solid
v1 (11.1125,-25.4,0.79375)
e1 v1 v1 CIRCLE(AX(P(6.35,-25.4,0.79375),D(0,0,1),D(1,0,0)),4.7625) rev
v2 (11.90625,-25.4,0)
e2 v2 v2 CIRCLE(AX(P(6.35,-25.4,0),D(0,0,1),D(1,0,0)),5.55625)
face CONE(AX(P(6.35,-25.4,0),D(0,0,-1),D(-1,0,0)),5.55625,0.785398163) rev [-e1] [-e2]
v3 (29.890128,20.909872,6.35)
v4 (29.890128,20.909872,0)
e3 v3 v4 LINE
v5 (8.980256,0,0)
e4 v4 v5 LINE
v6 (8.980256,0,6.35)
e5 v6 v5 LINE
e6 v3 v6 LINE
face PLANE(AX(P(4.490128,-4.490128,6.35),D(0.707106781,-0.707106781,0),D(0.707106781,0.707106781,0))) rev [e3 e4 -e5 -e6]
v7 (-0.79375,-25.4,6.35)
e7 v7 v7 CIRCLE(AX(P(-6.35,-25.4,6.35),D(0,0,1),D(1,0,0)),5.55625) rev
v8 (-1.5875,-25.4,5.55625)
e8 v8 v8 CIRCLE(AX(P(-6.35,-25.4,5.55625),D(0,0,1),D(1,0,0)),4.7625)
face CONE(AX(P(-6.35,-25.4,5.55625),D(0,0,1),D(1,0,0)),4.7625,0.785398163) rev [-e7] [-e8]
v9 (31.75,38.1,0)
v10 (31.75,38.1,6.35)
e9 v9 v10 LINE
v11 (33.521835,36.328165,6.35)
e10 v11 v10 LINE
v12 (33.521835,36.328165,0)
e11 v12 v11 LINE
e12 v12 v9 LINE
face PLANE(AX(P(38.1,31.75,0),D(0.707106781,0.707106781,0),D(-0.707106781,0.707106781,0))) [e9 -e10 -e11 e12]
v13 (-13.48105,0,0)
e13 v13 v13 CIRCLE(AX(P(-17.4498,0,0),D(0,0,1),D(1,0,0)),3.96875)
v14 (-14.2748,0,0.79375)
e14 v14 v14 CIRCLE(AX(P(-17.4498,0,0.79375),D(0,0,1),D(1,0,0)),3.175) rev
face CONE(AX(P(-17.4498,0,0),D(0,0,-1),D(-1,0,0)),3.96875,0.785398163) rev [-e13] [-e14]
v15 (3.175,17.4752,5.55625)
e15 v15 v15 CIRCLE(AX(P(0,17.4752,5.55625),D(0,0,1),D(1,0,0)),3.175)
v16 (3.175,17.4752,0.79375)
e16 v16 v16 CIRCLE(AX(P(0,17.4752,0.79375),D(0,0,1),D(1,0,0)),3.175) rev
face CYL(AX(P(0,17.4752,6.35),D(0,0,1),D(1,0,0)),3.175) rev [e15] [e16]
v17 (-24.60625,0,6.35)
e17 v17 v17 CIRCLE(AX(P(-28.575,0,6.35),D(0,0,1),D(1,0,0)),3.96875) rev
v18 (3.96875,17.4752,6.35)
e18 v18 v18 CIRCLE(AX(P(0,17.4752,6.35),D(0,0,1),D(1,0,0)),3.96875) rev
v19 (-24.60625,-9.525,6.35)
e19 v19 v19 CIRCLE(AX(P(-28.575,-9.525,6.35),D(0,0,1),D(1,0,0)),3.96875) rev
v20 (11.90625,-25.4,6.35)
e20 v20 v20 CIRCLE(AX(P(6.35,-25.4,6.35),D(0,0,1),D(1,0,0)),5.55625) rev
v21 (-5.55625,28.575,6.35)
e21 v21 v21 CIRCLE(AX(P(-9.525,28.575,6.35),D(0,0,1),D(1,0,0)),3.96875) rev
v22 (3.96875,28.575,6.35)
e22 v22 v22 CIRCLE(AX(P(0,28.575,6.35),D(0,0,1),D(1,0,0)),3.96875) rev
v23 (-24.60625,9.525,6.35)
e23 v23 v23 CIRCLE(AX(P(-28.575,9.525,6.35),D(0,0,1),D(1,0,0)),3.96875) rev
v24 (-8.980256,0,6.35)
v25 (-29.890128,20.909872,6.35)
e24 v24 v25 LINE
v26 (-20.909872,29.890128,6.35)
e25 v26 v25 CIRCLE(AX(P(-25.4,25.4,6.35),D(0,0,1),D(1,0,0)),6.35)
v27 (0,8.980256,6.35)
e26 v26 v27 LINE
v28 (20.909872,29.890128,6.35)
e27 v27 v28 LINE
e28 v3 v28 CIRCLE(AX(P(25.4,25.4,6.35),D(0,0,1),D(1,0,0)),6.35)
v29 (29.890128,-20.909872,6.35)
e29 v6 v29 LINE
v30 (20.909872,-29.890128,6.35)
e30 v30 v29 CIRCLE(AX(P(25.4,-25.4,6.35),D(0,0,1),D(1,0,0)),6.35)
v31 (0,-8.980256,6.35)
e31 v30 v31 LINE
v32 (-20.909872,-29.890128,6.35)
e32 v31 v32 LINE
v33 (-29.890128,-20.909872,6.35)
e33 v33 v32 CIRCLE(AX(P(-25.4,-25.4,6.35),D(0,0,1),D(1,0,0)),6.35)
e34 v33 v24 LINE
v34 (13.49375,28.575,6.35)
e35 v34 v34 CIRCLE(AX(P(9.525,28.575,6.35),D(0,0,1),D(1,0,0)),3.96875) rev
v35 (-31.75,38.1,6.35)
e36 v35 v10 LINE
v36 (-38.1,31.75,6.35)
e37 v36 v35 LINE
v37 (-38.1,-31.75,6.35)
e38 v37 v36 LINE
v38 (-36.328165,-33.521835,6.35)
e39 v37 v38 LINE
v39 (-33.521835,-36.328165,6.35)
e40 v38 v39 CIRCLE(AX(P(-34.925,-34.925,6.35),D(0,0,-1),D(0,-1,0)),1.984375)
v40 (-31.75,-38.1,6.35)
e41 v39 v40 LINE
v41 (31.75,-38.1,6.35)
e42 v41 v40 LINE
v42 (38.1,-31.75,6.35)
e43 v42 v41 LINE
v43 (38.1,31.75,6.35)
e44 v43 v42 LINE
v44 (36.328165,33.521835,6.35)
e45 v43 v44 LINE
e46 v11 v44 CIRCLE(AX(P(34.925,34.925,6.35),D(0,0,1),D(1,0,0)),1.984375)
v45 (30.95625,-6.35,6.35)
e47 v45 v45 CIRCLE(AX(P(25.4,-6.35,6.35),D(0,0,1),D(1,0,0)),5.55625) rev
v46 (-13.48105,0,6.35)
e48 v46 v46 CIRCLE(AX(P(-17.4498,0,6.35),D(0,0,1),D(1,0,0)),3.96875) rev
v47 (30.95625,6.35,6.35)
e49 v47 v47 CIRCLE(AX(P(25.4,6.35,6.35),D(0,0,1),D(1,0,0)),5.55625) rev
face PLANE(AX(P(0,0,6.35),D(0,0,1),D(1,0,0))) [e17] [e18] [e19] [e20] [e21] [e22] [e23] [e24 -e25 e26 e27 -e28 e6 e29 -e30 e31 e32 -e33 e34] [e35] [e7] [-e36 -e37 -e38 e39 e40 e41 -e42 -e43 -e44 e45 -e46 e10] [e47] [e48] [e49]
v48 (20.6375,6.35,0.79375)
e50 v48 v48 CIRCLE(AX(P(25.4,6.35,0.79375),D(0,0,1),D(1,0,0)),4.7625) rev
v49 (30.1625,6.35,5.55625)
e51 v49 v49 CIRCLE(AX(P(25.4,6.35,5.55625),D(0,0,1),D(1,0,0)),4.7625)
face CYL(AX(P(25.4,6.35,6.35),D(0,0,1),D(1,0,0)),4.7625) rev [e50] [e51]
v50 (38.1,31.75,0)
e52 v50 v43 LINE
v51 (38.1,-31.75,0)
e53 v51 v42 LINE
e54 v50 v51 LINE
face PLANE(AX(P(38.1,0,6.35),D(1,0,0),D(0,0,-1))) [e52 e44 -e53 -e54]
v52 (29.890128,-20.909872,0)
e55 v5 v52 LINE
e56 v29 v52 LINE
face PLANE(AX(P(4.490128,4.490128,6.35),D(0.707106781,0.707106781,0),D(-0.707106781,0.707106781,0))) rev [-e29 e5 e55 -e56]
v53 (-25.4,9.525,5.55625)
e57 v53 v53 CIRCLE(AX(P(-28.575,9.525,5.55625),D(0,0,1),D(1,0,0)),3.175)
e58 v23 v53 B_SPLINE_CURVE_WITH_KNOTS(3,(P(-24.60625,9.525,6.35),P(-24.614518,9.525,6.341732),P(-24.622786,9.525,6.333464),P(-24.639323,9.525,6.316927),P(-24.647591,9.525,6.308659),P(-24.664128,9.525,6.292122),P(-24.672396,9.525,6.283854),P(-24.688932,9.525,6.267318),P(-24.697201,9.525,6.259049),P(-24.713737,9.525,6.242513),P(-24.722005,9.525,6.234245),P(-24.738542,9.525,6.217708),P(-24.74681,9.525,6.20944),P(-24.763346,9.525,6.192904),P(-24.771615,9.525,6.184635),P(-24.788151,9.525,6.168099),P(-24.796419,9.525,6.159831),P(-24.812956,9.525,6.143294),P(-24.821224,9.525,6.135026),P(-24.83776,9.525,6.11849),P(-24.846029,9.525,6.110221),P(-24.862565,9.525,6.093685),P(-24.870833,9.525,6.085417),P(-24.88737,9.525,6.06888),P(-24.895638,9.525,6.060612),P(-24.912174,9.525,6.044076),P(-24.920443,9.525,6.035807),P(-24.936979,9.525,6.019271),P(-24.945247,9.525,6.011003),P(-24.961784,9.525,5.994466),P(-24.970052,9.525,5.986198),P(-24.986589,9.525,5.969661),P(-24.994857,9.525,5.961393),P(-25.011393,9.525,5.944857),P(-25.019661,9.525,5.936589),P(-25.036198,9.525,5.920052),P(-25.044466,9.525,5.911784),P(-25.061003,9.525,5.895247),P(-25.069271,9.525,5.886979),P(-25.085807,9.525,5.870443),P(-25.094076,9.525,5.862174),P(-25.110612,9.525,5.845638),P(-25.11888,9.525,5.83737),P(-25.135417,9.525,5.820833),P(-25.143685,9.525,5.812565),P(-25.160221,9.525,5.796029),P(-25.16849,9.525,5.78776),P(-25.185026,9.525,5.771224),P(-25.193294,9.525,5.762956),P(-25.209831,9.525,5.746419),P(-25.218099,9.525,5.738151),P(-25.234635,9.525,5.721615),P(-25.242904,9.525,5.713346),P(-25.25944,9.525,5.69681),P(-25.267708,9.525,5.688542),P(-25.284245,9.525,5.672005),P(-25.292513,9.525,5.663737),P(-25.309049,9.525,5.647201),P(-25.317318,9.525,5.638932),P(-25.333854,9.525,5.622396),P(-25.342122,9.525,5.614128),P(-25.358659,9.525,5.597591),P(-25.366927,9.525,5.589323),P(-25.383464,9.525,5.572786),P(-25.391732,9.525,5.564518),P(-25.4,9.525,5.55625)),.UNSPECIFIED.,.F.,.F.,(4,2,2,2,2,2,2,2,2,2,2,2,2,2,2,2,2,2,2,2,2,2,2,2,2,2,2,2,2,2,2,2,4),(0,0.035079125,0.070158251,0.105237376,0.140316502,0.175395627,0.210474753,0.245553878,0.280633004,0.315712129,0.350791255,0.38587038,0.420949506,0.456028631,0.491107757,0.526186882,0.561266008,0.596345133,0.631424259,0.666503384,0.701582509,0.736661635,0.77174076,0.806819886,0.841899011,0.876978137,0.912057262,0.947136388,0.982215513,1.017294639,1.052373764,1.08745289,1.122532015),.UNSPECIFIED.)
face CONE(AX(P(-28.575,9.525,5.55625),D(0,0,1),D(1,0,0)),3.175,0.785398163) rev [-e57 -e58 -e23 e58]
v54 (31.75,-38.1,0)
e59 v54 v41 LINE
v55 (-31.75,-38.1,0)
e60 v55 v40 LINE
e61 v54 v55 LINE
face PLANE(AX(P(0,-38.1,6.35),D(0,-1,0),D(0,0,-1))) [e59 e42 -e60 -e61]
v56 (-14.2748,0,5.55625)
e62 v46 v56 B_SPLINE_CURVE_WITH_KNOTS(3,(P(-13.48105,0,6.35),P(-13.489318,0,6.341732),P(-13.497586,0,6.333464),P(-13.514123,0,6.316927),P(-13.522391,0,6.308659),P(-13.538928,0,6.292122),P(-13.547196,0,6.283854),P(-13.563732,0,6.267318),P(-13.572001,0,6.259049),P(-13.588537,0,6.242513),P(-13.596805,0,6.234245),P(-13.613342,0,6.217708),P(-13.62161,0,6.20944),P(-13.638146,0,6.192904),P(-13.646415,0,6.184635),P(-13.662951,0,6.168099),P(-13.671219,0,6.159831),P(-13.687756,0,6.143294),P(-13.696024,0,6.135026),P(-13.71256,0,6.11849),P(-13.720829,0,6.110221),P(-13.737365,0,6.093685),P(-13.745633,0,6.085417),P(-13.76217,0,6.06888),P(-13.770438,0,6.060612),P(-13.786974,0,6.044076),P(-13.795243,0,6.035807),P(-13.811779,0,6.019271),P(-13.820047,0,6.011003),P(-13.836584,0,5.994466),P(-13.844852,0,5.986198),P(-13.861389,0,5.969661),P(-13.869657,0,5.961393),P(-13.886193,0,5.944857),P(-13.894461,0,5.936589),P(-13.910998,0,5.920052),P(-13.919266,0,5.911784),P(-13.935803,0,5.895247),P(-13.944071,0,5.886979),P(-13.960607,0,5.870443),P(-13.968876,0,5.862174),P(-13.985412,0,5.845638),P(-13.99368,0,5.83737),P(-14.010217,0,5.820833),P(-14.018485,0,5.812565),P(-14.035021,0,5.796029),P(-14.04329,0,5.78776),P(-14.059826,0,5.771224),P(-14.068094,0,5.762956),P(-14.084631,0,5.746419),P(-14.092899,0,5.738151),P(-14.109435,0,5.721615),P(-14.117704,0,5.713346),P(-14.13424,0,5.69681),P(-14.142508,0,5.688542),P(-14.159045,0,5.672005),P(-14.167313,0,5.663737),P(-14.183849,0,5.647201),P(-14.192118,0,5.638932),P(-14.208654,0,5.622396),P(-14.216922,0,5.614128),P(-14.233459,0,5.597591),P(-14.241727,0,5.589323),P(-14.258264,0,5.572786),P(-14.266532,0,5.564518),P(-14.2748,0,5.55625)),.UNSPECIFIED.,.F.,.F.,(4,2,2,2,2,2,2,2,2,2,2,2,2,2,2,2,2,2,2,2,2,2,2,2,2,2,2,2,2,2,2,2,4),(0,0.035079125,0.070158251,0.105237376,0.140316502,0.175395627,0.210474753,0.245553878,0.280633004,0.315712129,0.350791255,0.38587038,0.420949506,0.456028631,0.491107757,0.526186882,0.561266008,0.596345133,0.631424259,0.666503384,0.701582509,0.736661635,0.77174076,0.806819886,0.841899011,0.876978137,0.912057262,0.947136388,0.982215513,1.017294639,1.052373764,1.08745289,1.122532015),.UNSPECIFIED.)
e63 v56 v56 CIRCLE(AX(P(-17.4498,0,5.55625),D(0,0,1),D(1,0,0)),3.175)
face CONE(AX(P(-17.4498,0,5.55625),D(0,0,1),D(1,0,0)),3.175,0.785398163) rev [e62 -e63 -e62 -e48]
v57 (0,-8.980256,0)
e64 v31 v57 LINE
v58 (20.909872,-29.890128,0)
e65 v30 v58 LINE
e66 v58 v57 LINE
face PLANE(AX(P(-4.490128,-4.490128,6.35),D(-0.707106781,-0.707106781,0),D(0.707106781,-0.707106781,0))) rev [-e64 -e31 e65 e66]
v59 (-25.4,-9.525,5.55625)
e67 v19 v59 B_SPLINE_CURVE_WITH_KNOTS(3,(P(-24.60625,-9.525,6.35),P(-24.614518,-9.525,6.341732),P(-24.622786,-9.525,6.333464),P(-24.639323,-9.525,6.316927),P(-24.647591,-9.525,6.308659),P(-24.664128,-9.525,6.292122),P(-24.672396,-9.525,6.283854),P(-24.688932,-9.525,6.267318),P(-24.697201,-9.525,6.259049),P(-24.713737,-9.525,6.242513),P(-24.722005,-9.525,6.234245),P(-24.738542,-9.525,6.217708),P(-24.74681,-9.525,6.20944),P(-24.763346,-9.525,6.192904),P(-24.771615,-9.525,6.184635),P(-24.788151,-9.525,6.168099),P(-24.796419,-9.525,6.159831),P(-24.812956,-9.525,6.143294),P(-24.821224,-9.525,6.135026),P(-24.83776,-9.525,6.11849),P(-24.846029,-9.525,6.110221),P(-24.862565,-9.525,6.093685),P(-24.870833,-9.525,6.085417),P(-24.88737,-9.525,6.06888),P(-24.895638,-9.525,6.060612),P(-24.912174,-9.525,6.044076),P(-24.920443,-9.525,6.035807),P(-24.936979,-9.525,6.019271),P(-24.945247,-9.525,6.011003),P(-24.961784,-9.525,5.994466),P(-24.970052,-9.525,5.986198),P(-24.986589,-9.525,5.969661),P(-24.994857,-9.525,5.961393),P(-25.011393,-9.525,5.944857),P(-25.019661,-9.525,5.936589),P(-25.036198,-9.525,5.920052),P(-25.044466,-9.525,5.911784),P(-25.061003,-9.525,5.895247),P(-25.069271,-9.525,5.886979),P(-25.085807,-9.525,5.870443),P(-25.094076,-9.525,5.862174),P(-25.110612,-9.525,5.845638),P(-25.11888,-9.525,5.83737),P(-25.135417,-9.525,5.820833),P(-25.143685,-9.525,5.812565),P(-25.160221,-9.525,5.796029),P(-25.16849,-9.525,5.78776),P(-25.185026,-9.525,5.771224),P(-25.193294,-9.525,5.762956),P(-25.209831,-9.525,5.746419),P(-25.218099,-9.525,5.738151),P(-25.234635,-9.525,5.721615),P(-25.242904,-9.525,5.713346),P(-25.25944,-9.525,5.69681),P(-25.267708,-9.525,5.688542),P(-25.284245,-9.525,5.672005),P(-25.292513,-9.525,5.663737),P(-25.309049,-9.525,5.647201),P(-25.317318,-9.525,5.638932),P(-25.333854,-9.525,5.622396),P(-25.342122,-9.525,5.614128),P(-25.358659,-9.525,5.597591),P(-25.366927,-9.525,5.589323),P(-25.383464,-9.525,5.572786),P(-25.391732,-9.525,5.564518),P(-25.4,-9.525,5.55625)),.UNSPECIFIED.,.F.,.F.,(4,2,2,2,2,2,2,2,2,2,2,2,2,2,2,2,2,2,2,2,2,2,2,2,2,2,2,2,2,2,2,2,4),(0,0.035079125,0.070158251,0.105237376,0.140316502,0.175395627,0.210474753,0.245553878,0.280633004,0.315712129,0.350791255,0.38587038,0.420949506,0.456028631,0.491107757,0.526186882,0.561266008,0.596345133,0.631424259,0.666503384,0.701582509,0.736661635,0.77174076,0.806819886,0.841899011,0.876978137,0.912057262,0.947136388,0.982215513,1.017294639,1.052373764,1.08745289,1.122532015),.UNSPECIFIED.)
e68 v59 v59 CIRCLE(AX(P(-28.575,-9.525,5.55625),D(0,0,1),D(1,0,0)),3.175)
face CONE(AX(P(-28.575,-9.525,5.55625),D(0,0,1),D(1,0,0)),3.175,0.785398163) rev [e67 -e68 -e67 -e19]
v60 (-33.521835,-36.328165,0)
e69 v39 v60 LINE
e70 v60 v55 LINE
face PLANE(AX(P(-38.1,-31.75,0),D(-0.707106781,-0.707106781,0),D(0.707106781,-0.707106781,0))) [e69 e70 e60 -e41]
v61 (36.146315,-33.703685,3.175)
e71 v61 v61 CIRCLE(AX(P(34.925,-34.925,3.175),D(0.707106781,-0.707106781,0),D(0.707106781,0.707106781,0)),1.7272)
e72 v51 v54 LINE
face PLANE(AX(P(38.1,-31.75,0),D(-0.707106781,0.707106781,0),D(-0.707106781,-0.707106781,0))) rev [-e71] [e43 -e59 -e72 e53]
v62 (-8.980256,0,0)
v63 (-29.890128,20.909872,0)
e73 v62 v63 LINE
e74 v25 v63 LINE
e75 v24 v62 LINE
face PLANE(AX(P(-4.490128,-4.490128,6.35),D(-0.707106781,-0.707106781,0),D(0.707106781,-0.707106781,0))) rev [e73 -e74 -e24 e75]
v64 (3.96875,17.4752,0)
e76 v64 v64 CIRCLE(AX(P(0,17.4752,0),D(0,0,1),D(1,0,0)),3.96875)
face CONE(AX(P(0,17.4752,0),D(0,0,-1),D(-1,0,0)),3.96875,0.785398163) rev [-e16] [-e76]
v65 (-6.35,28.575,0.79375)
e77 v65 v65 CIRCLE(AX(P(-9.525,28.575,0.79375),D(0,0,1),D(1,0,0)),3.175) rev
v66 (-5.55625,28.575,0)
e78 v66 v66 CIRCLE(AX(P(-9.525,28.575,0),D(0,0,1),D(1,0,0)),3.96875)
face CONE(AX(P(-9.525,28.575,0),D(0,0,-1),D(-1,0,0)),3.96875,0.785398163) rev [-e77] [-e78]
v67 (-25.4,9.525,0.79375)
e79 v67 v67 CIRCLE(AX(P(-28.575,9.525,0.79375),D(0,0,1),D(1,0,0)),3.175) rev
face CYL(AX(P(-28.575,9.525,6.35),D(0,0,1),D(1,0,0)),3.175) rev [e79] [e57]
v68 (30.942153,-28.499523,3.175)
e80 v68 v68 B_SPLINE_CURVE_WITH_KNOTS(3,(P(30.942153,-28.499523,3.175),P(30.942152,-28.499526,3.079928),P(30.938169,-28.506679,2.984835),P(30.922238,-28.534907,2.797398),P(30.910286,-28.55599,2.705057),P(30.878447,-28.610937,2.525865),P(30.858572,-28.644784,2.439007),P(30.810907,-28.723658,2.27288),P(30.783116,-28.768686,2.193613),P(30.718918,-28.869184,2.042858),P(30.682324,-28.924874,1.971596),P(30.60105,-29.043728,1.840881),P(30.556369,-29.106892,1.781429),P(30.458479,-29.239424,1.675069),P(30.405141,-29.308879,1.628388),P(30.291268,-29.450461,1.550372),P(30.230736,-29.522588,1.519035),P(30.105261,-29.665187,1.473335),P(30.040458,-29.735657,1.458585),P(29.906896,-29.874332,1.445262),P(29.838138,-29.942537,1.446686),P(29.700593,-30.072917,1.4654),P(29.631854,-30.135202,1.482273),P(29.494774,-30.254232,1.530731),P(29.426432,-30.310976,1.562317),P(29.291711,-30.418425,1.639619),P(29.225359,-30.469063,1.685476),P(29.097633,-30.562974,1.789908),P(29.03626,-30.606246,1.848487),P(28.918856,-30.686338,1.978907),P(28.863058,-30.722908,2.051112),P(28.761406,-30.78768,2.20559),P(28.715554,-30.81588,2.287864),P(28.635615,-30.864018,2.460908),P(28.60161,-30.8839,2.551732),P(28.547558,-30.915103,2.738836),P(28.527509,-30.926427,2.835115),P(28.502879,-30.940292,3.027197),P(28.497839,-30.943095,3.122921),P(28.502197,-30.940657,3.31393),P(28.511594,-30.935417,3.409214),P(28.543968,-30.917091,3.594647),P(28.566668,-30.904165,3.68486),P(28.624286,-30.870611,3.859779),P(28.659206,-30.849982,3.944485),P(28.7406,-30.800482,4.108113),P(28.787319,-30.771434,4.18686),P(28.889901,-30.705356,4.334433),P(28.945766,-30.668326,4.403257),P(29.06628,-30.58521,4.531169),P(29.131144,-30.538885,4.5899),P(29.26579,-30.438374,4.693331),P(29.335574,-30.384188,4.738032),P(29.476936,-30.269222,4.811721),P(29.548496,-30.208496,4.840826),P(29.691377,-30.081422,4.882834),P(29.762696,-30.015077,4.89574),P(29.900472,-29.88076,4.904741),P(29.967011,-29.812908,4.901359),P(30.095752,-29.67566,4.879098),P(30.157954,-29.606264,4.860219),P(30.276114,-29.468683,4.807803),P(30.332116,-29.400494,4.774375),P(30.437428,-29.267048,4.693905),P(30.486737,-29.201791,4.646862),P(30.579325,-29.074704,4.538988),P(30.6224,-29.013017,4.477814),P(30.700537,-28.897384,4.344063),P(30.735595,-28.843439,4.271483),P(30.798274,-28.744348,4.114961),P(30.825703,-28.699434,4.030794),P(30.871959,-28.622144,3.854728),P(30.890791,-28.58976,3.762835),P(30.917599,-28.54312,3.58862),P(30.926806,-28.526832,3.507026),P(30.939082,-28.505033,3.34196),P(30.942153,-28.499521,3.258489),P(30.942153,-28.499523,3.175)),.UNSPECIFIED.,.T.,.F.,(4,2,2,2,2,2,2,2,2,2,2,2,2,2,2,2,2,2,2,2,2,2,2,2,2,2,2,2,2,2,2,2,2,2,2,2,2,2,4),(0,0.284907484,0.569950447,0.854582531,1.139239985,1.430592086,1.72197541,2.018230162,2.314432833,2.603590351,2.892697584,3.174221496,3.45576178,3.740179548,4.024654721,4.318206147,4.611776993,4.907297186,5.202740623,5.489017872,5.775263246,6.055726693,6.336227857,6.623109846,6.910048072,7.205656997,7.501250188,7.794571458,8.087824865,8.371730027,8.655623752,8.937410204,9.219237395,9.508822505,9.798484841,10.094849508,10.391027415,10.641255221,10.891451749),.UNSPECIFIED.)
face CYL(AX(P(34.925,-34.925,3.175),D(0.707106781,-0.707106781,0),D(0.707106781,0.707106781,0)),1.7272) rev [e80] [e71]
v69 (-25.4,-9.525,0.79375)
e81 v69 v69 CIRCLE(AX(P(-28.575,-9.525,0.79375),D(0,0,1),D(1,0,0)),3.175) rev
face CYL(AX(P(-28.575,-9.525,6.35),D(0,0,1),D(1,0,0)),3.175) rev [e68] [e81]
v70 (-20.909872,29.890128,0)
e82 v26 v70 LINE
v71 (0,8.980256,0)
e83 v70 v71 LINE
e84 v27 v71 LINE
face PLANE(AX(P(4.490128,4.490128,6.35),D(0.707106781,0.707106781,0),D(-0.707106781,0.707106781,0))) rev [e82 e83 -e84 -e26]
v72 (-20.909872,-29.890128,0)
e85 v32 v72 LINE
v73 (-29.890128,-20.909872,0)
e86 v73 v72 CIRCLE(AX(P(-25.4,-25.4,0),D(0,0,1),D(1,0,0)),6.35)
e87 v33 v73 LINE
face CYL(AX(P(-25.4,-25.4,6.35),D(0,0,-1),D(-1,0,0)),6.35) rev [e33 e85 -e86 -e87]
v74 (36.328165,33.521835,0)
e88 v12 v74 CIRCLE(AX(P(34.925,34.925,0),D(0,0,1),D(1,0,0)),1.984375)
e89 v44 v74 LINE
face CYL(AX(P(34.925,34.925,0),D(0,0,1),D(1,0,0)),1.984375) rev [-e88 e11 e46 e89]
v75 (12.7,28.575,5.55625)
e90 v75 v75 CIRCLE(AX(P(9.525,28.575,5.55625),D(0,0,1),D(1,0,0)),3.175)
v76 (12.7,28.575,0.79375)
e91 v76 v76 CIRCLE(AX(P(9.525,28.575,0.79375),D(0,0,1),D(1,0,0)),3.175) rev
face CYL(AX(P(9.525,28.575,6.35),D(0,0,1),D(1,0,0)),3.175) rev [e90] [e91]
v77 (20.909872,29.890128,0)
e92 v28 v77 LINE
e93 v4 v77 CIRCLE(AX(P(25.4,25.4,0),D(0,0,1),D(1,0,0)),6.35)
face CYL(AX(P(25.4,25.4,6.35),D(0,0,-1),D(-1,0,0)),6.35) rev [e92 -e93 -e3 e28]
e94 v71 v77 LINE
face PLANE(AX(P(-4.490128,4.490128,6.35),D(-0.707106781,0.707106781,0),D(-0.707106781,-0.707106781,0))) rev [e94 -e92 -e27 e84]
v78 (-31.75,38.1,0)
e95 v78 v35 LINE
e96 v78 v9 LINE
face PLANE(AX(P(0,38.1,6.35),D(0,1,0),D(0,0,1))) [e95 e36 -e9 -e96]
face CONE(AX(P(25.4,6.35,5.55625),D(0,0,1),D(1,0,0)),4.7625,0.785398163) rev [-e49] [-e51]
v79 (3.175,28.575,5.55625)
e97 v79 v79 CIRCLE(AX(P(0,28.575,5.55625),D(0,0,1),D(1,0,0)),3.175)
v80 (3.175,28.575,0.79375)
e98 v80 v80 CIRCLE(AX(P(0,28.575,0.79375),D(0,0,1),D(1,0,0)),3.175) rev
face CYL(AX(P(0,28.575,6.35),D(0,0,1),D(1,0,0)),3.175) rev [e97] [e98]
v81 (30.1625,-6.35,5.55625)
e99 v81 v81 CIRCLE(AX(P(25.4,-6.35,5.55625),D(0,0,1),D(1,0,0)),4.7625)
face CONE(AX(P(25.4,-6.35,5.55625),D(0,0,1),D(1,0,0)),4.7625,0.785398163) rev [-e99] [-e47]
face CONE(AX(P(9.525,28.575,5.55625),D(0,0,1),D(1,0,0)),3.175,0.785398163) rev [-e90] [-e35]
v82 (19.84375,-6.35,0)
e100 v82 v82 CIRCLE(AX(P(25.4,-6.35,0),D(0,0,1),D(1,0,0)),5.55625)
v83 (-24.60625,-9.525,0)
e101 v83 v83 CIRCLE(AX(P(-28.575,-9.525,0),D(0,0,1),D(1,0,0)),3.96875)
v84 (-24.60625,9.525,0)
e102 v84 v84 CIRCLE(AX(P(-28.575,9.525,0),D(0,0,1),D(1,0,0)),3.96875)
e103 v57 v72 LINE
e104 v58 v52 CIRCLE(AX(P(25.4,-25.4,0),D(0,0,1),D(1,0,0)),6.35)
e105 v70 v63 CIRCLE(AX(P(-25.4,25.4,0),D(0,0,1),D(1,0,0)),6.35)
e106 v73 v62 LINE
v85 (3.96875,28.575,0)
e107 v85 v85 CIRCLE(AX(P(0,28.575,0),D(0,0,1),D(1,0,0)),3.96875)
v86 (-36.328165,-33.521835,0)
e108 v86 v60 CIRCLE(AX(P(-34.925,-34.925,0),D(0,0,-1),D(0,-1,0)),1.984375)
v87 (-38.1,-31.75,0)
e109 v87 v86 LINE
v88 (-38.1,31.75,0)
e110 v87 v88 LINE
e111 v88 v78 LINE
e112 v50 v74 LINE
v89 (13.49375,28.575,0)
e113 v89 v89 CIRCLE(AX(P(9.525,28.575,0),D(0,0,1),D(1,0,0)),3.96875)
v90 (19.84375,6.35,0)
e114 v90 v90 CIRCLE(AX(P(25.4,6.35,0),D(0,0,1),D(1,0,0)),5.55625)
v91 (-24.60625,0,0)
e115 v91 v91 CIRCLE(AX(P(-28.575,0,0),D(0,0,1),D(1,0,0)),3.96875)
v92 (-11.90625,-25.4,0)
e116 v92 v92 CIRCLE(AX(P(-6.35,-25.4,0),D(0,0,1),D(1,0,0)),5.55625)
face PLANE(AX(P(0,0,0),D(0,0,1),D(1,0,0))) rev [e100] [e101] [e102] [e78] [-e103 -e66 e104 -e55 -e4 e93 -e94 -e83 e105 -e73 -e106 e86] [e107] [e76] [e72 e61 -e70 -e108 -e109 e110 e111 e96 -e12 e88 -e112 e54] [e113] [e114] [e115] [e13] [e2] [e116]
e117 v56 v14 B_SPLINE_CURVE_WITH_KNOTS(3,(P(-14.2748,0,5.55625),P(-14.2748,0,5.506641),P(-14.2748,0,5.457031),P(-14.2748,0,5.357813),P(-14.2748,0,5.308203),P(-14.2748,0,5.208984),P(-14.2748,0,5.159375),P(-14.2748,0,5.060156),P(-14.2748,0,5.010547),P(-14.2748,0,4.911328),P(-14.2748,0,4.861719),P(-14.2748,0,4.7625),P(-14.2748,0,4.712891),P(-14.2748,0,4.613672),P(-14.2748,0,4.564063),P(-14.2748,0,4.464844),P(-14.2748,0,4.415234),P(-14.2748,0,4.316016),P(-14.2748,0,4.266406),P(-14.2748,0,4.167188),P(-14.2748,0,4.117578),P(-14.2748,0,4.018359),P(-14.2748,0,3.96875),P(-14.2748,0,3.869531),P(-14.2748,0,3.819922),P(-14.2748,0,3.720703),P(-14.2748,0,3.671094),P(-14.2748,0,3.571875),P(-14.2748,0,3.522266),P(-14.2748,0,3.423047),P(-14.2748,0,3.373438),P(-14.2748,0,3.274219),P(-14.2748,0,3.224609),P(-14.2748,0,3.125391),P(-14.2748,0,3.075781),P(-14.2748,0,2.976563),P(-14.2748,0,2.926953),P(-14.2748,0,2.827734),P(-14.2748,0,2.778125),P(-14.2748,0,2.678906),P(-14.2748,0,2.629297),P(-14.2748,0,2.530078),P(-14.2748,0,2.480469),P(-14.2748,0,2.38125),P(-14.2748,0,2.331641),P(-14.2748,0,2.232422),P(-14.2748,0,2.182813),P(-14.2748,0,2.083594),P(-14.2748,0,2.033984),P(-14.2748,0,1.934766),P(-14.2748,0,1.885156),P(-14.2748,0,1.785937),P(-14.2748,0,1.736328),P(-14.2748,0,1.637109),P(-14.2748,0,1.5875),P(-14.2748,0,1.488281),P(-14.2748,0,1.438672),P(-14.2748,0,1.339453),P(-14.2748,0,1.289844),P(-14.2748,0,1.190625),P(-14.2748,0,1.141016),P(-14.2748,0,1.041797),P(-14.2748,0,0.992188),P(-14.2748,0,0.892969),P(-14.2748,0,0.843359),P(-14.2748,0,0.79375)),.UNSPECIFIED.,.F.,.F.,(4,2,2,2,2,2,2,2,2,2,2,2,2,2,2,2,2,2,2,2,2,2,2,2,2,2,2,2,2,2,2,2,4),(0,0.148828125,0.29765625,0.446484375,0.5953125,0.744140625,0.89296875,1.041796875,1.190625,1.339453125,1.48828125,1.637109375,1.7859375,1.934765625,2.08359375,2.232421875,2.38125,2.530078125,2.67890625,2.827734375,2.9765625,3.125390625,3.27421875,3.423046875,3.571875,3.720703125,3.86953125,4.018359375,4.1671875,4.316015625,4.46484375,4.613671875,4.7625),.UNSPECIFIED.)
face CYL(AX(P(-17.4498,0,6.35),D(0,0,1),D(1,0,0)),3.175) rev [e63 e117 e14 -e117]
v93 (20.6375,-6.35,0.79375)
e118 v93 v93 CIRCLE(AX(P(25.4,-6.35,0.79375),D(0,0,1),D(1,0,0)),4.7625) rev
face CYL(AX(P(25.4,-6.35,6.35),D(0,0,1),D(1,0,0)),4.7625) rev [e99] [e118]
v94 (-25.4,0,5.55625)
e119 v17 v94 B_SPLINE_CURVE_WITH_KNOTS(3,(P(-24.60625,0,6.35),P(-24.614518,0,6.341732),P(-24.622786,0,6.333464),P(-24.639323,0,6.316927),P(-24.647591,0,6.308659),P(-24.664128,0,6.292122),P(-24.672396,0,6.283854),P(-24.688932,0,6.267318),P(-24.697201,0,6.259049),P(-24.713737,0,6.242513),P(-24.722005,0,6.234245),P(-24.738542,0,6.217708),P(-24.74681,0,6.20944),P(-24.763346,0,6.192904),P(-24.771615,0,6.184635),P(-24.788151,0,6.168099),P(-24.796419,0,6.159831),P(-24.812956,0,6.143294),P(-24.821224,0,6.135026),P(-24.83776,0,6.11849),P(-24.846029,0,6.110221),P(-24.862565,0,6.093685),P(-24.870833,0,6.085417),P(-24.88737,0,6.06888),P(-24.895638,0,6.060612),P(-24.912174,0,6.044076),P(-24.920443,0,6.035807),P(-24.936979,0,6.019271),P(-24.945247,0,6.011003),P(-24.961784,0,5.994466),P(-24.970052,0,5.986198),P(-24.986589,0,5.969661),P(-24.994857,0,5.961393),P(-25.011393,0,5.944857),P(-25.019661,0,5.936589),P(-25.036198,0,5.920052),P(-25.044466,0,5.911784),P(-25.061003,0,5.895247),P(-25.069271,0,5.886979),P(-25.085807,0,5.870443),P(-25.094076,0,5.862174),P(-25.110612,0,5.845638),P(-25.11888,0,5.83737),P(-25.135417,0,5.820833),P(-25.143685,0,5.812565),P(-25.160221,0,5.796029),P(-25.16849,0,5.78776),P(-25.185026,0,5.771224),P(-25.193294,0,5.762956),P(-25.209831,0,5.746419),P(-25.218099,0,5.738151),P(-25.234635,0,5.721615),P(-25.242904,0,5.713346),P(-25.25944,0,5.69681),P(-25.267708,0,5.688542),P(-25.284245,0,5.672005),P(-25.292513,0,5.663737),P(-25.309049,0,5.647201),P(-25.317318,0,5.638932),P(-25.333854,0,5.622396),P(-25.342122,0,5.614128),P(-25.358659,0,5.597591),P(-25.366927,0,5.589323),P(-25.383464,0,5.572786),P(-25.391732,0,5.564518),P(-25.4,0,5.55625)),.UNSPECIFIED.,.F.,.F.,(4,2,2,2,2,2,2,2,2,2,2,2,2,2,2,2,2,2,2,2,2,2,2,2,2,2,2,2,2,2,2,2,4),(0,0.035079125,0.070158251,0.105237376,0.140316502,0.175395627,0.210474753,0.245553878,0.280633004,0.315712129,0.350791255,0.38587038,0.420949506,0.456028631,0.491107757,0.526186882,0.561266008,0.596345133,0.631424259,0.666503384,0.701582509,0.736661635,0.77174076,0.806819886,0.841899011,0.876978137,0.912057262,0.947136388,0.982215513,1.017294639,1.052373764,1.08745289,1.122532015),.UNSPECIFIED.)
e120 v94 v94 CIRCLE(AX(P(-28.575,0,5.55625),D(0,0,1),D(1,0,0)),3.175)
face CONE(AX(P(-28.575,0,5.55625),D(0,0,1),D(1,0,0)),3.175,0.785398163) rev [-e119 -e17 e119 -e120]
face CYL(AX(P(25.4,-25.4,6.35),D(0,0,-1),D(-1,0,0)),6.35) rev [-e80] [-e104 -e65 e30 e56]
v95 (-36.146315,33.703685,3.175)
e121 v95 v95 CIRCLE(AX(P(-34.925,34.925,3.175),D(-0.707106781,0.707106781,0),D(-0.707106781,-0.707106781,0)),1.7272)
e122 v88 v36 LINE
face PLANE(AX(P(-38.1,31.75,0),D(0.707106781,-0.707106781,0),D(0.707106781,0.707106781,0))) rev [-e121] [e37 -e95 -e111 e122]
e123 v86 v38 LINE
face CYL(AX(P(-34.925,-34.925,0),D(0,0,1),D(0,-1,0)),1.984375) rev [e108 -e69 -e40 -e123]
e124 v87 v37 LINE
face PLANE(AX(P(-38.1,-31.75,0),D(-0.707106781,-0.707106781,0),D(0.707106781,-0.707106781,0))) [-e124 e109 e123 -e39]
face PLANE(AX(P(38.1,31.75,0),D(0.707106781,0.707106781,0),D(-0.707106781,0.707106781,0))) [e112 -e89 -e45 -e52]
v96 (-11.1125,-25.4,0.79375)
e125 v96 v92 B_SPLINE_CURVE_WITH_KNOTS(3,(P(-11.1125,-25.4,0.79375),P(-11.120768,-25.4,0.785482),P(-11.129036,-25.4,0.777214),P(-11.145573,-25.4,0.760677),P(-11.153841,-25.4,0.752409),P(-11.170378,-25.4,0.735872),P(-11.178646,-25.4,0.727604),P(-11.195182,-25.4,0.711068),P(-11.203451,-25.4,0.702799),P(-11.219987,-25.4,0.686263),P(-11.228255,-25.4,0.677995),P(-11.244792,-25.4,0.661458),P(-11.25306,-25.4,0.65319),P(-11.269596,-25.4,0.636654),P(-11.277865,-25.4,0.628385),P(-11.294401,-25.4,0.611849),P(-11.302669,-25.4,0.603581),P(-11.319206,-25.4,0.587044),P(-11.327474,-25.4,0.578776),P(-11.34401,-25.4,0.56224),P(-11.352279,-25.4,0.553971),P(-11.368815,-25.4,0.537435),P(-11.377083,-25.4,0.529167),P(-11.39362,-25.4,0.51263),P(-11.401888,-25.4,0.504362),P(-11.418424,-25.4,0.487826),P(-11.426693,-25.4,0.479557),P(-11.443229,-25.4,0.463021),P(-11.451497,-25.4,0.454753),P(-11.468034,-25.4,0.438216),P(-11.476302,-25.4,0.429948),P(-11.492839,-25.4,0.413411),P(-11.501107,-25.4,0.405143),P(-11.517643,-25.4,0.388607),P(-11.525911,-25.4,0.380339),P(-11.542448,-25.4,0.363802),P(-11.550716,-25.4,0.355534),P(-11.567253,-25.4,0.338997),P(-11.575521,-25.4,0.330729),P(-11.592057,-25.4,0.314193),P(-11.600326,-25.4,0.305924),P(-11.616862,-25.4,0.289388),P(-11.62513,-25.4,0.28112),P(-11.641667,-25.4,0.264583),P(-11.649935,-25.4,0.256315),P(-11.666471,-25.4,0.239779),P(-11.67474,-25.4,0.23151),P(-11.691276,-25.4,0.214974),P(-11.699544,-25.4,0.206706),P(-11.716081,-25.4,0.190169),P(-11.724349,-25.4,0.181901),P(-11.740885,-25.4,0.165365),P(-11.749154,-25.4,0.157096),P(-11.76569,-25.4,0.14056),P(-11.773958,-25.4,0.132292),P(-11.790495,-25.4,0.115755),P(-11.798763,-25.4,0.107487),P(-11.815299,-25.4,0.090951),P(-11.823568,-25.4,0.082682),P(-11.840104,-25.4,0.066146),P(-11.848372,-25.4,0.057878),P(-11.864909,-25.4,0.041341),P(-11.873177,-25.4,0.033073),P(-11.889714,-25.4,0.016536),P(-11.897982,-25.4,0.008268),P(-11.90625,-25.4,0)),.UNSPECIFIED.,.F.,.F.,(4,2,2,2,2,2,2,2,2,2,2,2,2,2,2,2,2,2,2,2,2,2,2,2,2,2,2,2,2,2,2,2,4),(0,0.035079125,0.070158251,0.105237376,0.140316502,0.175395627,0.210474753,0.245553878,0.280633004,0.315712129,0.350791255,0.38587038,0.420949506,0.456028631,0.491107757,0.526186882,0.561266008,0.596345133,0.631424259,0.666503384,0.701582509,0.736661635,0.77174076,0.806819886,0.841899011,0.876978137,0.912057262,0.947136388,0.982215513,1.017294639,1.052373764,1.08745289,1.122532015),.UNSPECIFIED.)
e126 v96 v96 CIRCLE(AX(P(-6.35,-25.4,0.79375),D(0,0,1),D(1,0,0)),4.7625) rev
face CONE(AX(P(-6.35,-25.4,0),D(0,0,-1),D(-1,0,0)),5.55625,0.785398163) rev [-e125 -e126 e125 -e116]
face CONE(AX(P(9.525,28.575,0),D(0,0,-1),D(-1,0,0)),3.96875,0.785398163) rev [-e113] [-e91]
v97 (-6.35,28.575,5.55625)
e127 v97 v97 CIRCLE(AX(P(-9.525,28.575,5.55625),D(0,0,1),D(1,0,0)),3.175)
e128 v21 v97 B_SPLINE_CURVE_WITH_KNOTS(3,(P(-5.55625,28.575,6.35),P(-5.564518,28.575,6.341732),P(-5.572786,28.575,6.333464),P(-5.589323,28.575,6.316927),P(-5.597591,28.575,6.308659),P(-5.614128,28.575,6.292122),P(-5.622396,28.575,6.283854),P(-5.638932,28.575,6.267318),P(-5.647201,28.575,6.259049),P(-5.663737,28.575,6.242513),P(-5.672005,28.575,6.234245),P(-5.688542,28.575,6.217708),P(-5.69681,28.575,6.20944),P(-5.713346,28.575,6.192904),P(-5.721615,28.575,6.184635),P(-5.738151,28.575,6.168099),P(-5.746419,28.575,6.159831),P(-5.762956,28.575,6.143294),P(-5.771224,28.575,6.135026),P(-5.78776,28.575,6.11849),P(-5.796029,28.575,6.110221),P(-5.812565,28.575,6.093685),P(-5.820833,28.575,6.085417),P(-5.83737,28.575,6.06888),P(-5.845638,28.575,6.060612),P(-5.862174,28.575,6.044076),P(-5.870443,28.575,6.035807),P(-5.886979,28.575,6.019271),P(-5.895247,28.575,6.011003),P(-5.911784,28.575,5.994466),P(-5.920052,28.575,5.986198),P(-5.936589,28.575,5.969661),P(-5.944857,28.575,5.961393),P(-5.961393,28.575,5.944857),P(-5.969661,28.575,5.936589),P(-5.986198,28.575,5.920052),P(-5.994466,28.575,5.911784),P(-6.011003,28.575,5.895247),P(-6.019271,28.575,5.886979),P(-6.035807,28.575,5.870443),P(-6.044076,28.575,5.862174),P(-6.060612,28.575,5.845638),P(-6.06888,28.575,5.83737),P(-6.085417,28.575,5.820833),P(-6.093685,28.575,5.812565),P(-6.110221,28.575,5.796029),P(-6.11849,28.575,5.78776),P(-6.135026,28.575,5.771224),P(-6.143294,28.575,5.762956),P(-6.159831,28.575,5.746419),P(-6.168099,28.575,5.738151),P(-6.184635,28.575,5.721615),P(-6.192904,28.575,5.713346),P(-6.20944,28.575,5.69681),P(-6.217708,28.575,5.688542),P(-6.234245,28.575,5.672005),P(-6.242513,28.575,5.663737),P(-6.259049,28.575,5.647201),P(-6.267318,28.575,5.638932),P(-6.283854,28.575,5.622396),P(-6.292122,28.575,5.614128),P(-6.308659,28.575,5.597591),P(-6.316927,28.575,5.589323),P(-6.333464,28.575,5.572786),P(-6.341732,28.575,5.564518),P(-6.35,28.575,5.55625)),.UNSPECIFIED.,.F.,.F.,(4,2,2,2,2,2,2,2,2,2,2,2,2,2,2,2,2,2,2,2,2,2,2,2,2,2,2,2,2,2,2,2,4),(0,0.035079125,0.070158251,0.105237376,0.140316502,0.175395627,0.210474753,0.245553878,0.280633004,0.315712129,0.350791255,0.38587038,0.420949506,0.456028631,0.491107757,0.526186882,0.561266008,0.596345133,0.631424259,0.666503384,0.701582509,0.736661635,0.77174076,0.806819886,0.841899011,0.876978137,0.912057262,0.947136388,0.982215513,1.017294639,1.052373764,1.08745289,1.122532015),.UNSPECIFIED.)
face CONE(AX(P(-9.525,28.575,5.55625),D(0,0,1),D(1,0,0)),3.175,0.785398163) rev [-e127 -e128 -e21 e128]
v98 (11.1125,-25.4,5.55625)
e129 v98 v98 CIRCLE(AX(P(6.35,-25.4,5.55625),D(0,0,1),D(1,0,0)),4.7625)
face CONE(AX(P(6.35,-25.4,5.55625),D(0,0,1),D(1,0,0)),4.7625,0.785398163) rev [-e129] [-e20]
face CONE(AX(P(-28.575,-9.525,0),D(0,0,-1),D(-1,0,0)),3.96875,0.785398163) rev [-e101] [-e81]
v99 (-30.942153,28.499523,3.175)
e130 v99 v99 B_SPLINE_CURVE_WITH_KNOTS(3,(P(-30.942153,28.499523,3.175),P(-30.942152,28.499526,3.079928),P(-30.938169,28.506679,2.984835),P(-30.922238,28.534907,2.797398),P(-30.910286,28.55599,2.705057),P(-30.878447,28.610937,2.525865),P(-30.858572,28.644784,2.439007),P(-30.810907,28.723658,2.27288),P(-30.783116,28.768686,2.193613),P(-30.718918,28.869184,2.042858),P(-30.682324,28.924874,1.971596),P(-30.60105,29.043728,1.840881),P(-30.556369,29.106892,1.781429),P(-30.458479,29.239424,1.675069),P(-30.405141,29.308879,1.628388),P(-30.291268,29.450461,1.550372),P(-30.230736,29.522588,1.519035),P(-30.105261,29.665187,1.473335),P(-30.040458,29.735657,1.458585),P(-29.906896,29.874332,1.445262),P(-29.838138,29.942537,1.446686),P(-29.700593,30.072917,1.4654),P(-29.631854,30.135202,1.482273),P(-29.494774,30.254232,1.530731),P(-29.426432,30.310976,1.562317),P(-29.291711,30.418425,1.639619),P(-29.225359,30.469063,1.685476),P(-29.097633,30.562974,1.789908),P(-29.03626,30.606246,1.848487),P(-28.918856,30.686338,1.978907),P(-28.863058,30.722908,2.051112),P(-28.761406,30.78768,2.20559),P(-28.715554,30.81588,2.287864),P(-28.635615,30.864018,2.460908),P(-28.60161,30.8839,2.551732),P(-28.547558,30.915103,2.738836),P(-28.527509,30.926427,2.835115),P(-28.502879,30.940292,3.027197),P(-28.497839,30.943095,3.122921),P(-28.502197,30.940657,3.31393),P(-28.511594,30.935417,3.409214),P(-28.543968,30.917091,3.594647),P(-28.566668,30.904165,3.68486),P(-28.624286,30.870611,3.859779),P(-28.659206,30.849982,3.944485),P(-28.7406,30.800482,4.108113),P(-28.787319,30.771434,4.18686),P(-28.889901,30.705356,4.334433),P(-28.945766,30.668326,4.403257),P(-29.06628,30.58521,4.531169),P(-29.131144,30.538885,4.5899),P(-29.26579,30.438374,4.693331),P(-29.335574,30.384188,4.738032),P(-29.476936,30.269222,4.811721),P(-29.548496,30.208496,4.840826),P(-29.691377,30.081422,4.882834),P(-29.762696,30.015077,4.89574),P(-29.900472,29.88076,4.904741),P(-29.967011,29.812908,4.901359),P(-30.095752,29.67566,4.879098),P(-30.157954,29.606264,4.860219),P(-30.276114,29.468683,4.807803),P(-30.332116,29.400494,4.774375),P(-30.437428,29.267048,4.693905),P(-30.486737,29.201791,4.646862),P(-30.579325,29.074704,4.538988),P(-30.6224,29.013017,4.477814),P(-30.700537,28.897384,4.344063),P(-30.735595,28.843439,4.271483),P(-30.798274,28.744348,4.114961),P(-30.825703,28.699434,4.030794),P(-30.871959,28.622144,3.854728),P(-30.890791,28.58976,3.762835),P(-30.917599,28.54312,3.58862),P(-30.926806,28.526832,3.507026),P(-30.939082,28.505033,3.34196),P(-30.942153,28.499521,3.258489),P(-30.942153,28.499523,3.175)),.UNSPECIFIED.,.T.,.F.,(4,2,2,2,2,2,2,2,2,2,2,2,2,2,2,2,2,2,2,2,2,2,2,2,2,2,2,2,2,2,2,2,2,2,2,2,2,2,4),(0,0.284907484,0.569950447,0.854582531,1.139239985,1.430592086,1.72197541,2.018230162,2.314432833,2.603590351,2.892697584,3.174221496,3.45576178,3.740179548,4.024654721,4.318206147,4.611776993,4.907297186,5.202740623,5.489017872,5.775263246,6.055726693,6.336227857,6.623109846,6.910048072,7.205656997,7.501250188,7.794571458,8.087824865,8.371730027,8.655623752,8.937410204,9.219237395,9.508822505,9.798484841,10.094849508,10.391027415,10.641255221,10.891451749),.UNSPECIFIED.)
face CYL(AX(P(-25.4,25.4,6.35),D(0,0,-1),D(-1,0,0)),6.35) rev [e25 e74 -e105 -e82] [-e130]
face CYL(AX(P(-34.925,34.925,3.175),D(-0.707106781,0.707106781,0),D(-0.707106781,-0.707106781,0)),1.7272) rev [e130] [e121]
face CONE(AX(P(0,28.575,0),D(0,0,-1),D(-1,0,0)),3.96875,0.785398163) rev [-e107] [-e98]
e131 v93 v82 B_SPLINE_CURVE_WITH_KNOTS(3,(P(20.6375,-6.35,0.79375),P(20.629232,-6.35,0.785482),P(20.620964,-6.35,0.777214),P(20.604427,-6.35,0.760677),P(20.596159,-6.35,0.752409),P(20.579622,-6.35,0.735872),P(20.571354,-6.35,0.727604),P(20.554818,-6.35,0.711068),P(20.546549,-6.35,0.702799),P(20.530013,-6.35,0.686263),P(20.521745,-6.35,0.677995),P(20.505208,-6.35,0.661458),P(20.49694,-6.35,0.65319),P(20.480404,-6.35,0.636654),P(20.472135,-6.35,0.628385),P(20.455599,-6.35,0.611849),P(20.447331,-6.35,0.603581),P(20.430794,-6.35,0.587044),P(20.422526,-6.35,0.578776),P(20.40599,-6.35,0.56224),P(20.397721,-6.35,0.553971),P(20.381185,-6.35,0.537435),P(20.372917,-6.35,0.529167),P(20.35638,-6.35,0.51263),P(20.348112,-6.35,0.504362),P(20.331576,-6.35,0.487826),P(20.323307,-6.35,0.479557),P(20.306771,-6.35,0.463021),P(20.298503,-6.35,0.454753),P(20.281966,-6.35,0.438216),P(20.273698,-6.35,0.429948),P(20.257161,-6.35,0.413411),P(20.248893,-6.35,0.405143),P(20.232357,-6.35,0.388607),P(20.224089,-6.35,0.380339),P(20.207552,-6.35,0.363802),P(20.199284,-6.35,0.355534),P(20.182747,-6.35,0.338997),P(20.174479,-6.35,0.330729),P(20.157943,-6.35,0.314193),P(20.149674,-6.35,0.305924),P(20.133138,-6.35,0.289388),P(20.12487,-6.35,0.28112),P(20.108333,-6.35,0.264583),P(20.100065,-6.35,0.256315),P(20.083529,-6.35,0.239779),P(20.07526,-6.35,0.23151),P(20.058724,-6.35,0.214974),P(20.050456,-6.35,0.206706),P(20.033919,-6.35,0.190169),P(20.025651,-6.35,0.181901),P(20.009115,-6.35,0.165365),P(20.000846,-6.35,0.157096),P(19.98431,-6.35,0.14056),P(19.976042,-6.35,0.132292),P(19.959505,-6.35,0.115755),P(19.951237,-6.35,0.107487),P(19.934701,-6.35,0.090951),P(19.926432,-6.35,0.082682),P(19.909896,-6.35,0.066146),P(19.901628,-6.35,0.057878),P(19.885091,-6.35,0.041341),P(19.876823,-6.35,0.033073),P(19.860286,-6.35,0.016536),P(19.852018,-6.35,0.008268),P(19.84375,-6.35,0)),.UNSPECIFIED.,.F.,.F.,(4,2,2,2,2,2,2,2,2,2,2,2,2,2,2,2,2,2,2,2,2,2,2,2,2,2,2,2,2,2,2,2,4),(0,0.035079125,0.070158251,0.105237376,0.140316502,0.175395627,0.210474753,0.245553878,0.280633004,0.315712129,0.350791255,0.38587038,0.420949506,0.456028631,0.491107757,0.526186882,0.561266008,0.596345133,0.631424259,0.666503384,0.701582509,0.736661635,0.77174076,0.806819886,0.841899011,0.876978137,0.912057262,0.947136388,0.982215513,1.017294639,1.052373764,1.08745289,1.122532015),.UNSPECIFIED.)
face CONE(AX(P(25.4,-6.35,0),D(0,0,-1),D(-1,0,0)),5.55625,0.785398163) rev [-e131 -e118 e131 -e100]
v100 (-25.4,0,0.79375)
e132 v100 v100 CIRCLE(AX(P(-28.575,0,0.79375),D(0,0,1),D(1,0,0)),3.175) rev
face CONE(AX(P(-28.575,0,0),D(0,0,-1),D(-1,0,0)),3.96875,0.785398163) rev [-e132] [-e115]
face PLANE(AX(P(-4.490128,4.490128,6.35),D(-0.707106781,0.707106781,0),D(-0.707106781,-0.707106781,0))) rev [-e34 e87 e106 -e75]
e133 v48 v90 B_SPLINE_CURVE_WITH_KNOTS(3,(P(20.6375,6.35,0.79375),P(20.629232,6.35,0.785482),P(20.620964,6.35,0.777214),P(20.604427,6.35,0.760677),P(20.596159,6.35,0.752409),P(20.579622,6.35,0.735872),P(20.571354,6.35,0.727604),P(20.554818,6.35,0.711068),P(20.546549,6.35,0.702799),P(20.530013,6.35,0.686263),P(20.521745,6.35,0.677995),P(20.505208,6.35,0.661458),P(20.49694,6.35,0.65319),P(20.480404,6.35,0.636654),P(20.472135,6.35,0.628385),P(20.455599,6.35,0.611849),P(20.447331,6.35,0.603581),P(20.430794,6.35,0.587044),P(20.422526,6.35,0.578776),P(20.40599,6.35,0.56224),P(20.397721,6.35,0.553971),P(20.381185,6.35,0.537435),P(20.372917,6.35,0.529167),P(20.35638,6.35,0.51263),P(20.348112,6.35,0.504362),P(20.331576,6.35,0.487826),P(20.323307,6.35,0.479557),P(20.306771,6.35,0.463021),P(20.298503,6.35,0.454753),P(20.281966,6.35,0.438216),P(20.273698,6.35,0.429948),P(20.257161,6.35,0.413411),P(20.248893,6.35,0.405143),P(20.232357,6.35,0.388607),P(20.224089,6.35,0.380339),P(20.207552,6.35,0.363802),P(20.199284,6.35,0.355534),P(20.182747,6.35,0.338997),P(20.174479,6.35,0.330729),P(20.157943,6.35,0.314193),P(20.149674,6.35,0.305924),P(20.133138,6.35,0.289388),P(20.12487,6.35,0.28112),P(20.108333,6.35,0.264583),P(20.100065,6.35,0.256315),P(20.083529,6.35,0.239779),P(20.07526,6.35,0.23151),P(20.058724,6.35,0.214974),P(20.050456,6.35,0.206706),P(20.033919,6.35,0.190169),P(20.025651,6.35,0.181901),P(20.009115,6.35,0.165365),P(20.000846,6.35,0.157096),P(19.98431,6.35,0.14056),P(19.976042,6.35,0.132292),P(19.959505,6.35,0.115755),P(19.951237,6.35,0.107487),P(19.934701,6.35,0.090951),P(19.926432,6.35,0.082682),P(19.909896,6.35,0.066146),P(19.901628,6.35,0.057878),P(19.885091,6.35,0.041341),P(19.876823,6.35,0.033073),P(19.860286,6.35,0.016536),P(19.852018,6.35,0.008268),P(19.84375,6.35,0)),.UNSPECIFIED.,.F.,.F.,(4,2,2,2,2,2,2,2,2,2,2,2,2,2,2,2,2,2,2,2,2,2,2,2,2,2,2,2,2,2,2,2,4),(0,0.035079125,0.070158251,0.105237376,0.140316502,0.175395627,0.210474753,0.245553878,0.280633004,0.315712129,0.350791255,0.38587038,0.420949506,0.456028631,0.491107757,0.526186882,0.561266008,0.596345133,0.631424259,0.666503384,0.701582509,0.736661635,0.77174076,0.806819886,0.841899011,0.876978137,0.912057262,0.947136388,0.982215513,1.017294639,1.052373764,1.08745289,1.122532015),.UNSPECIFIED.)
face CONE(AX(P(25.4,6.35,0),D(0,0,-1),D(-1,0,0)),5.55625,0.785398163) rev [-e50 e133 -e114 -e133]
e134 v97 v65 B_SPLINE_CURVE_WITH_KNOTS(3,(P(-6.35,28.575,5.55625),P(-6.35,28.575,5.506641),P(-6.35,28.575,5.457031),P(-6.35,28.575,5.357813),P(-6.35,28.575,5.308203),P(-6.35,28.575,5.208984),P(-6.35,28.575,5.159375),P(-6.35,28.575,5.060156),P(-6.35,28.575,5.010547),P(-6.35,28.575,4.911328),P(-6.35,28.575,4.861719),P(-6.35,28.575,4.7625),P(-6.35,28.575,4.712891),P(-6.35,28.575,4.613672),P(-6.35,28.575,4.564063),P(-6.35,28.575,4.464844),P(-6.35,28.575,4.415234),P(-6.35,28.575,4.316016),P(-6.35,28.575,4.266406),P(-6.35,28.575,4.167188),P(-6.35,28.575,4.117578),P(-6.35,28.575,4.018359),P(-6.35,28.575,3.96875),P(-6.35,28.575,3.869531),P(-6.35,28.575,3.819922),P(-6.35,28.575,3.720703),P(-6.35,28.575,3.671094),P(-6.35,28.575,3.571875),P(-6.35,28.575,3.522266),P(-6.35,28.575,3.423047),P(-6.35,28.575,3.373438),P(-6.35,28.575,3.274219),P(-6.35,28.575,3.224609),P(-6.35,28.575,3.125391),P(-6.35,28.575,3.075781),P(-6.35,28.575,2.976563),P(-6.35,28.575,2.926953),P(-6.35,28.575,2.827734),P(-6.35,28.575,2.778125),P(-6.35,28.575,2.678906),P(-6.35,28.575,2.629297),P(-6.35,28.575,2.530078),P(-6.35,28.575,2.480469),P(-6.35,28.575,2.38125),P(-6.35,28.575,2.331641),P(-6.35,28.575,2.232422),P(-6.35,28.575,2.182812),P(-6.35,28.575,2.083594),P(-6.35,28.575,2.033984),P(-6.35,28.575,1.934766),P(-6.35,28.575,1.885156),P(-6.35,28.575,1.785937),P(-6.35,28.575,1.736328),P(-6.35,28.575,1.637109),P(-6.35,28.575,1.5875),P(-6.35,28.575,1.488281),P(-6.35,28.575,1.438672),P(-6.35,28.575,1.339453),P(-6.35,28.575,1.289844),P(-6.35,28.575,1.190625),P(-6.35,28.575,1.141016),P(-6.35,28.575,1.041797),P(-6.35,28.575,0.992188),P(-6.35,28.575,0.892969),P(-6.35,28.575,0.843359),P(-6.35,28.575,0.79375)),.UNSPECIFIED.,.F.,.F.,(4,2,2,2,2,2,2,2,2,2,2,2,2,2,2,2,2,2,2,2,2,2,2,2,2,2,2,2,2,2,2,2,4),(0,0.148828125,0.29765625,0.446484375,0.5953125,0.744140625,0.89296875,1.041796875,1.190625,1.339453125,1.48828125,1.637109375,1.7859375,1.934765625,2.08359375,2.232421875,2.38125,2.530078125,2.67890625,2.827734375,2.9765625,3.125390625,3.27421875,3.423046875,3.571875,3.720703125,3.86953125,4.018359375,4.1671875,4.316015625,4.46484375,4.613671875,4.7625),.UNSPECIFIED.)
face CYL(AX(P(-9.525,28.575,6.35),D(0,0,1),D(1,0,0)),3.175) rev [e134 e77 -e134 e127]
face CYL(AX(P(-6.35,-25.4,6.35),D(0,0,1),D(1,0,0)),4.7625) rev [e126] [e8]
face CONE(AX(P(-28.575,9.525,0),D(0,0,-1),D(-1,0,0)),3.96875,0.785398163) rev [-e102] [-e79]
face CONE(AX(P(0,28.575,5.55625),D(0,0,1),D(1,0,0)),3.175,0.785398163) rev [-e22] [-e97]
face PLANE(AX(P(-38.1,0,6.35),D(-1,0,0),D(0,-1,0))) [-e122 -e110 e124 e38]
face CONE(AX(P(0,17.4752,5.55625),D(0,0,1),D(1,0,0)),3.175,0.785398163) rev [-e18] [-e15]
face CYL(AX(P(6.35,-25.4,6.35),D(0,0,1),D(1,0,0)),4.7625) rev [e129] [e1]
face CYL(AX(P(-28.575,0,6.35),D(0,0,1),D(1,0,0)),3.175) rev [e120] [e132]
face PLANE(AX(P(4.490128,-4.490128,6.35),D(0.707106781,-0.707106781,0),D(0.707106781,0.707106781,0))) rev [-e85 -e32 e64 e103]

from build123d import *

# Parameters (mm, degrees)
SKETCH1_W            = 76.2
SKETCH1_H            = 76.2
EXTRUSION1_DEPTH     = 6.35
EXTRUSION2_DEPTH     = 55.254423783
MIRROR2_COPY_1_DEPTH = 55.254423783
SKETCH3_R            = 1.984375
EXTRUSION3_DEPTH     = 55.254423783
HOLE3_START          = -49.391408666
HOLE3_OUTLINE_R      = 1.7272
HOLE3_DEPTH          = 13.470384182
MIRROR4_START        = 35.921024484
MIRROR4_OUTLINE_R    = 1.7272
MIRROR4_DEPTH        = 13.470384182


with BuildPart() as part:
    # Sketch1 → Extrusion1 (new body)
    with BuildSketch(Plane.XY):
        Rectangle(SKETCH1_W, SKETCH1_H)
        with BuildLine():
            ThreePointArc((-29.890128061, -20.909871939), (-29.890128061, -29.890128061), (-20.909871939, -29.890128061))
            Line((-20.909871939, -29.890128061), (0, -8.980256121))
            Line((0, -8.980256121), (20.909871939, -29.890128061))
            ThreePointArc((20.909871939, -29.890128061), (29.890128061, -29.890128061), (29.890128061, -20.909871939))
            Line((29.890128061, -20.909871939), (8.980256121, 0))
            Line((8.980256121, 0), (29.890128061, 20.909871939))
            ThreePointArc((29.890128061, 20.909871939), (29.890128061, 29.890128061), (20.909871939, 29.890128061))
            Line((20.909871939, 29.890128061), (0, 8.980256121))
            Line((0, 8.980256121), (-20.909871939, 29.890128061))
            ThreePointArc((-20.909871939, 29.890128061), (-29.890128061, 29.890128061), (-29.890128061, 20.909871939))
            Line((-29.890128061, 20.909871939), (-8.980256121, 0))
            Line((-8.980256121, 0), (-29.890128061, -20.909871939))
        make_face(mode=Mode.SUBTRACT)
    extrude(amount=EXTRUSION1_DEPTH)

    # Sketch2 → Extrusion2 (cut, through all)
    with BuildSketch(Plane.XY.offset(6.35)):
        Polygon((-38.1, 38.1), (-38.1, 31.75), (-31.75, 38.1), align=None)
    extrusion2 = extrude(amount=-EXTRUSION2_DEPTH, mode=Mode.SUBTRACT)

    # Mirror1: Extrusion2 across plane
    add(extrusion2.mirror(Plane.ZX), mode=Mode.SUBTRACT)

    # Mirror2: Extrusion2 across plane
    add(extrusion2.mirror(Plane(origin=(0, 0, 0), x_dir=(0, 0, 1), z_dir=(1, 0, 0))), mode=Mode.SUBTRACT)

    # Mirror2 copy 1 sketch → Mirror2 copy 1 (cut, through all)
    with BuildSketch(Plane(origin=(0, 0, 6.35), x_dir=(-1, 0, 0), z_dir=(0, 0, 1))):
        Polygon((-38.1, 38.1), (-38.1, 31.75), (-31.75, 38.1), align=None)
    extrude(amount=-MIRROR2_COPY_1_DEPTH, mode=Mode.SUBTRACT)

    # Sketch3 → Extrusion3 (cut, through all)
    with BuildSketch(Plane.XY.offset(6.35)):
        with Locations((34.925, 34.925)):
            Circle(SKETCH3_R)
    extrusion3 = extrude(amount=-EXTRUSION3_DEPTH, mode=Mode.SUBTRACT)

    # Mirror3: Extrusion3 across plane
    add(extrusion3.mirror(Plane(origin=(0, 0, 6.35), x_dir=(0, 0, 1), z_dir=(0.7071067811865472, 0.7071067811865478, 0))), mode=Mode.SUBTRACT)

    # Chamfer1: read off the stored shape, not the designer's step
    # Chamfer1 outline → Chamfer1 (revolve, cut)
    with BuildSketch(Plane(origin=(-17.4498, 0, 0), x_dir=(1, 0, 0), z_dir=(0, -1, 0))):
        Polygon((0, 0), (3.96875, 0), (3.175, 0.79375), (3.175, 5.55625), (3.96875, 6.35), (0, 6.35), align=None)
    revolve(axis=Axis((-17.4498, 0, 0), (0, 0, 1)), mode=Mode.SUBTRACT)

    # Chamfer1 2 outline → Chamfer1 2 (revolve, cut)
    with BuildSketch(Plane(origin=(-28.575, -9.525, 0), x_dir=(1, 0, 0), z_dir=(0, -1, 0))):
        Polygon((0, 0), (3.96875, 0), (3.175, 0.79375), (3.175, 5.55625), (3.96875, 6.35), (0, 6.35), align=None)
    revolve(axis=Axis((-28.575, -9.525, 0), (0, 0, 1)), mode=Mode.SUBTRACT)

    # Chamfer1 3 outline → Chamfer1 3 (revolve, cut)
    with BuildSketch(Plane(origin=(-28.575, 0, 0), x_dir=(1, 0, 0), z_dir=(0, -1, 0))):
        Polygon((0, 0), (3.96875, 0), (3.175, 0.79375), (3.175, 5.55625), (3.96875, 6.35), (0, 6.35), align=None)
    revolve(axis=Axis((-28.575, 0, 0), (0, 0, 1)), mode=Mode.SUBTRACT)

    # Chamfer1 4 outline → Chamfer1 4 (revolve, cut)
    with BuildSketch(Plane(origin=(-28.575, 9.525, 0), x_dir=(1, 0, 0), z_dir=(0, -1, 0))):
        Polygon((0, 0), (3.96875, 0), (3.175, 0.79375), (3.175, 5.55625), (3.96875, 6.35), (0, 6.35), align=None)
    revolve(axis=Axis((-28.575, 9.525, 0), (0, 0, 1)), mode=Mode.SUBTRACT)

    # Chamfer1 5 outline → Chamfer1 5 (revolve, cut)
    with BuildSketch(Plane(origin=(-9.525, 28.575, 0), x_dir=(1, 0, 0), z_dir=(0, -1, 0))):
        Polygon((0, 0), (3.96875, 0), (3.175, 0.79375), (3.175, 5.55625), (3.96875, 6.35), (0, 6.35), align=None)
    revolve(axis=Axis((-9.525, 28.575, 0), (0, 0, 1)), mode=Mode.SUBTRACT)

    # Chamfer1 6 outline → Chamfer1 6 (revolve, cut)
    with BuildSketch(Plane(origin=(9.525, 28.575, 0), x_dir=(1, 0, 0), z_dir=(0, -1, 0))):
        Polygon((0, 0), (3.96875, 0), (3.175, 0.79375), (3.175, 5.55625), (3.96875, 6.35), (0, 6.35), align=None)
    revolve(axis=Axis((9.525, 28.575, 0), (0, 0, 1)), mode=Mode.SUBTRACT)

    # Chamfer1 7 outline → Chamfer1 7 (revolve, cut)
    with BuildSketch(Plane.XZ.offset(-28.575)):
        Polygon((0, 0), (3.96875, 0), (3.175, 0.79375), (3.175, 5.55625), (3.96875, 6.35), (0, 6.35), align=None)
    revolve(axis=Axis((0, 28.575, 0), (0, 0, 1)), mode=Mode.SUBTRACT)

    # Chamfer1 8 outline → Chamfer1 8 (revolve, cut)
    with BuildSketch(Plane.XZ.offset(-17.4752)):
        Polygon((0, 0), (3.96875, 0), (3.175, 0.79375), (3.175, 5.55625), (3.96875, 6.35), (0, 6.35), align=None)
    revolve(axis=Axis((0, 17.4752, 0), (0, 0, 1)), mode=Mode.SUBTRACT)

    # Hole3: read off the stored shape, not the designer's step
    # Hole3 outline → Hole3 (cut)
    with BuildSketch(Plane(origin=(0, 0, 0), x_dir=(0.7071067811865471, 0.707106781186548, 0), z_dir=(0.707106781186548, -0.707106781186547, 0)).offset(HOLE3_START)):
        with Locations((0, 3.175)):
            Circle(HOLE3_OUTLINE_R)
    extrude(amount=HOLE3_DEPTH, mode=Mode.SUBTRACT)

    # Hole3 2 outline → Hole3 2 (revolve, cut)
    with BuildSketch(Plane(origin=(-6.35, -25.4, 0), x_dir=(1, 0, 0), z_dir=(0, -1, 0))):
        Polygon((0, 0), (5.55625, 0), (4.7625, 0.79375), (4.7625, 5.55625), (5.55625, 6.35), (0, 6.35), align=None)
    revolve(axis=Axis((-6.35, -25.4, 0), (0, 0, 1)), mode=Mode.SUBTRACT)

    # Hole3 3 outline → Hole3 3 (revolve, cut)
    with BuildSketch(Plane(origin=(6.35, -25.4, 0), x_dir=(1, 0, 0), z_dir=(0, -1, 0))):
        Polygon((0, 0), (5.55625, 0), (4.7625, 0.79375), (4.7625, 5.55625), (5.55625, 6.35), (0, 6.35), align=None)
    revolve(axis=Axis((6.35, -25.4, 0), (0, 0, 1)), mode=Mode.SUBTRACT)

    # Hole3 4 outline → Hole3 4 (revolve, cut)
    with BuildSketch(Plane(origin=(25.4, -6.35, 0), x_dir=(1, 0, 0), z_dir=(0, -1, 0))):
        Polygon((0, 0), (5.55625, 0), (4.7625, 0.79375), (4.7625, 5.55625), (5.55625, 6.35), (0, 6.35), align=None)
    revolve(axis=Axis((25.4, -6.35, 0), (0, 0, 1)), mode=Mode.SUBTRACT)

    # Hole3 5 outline → Hole3 5 (revolve, cut)
    with BuildSketch(Plane(origin=(25.4, 6.35, 0), x_dir=(1, 0, 0), z_dir=(0, -1, 0))):
        Polygon((0, 0), (5.55625, 0), (4.7625, 0.79375), (4.7625, 5.55625), (5.55625, 6.35), (0, 6.35), align=None)
    revolve(axis=Axis((25.4, 6.35, 0), (0, 0, 1)), mode=Mode.SUBTRACT)

    # Mirror4: read off the stored shape, not the designer's step
    # Mirror4 outline → Mirror4 (cut)
    with BuildSketch(Plane(origin=(0, 0, 0), x_dir=(0.707106781186548, 0.707106781186547, 0), z_dir=(0.707106781186547, -0.707106781186548, 0)).offset(MIRROR4_START)):
        with Locations((0, 3.175)):
            Circle(MIRROR4_OUTLINE_R)
    extrude(amount=MIRROR4_DEPTH, mode=Mode.SUBTRACT)


solid = part.part
